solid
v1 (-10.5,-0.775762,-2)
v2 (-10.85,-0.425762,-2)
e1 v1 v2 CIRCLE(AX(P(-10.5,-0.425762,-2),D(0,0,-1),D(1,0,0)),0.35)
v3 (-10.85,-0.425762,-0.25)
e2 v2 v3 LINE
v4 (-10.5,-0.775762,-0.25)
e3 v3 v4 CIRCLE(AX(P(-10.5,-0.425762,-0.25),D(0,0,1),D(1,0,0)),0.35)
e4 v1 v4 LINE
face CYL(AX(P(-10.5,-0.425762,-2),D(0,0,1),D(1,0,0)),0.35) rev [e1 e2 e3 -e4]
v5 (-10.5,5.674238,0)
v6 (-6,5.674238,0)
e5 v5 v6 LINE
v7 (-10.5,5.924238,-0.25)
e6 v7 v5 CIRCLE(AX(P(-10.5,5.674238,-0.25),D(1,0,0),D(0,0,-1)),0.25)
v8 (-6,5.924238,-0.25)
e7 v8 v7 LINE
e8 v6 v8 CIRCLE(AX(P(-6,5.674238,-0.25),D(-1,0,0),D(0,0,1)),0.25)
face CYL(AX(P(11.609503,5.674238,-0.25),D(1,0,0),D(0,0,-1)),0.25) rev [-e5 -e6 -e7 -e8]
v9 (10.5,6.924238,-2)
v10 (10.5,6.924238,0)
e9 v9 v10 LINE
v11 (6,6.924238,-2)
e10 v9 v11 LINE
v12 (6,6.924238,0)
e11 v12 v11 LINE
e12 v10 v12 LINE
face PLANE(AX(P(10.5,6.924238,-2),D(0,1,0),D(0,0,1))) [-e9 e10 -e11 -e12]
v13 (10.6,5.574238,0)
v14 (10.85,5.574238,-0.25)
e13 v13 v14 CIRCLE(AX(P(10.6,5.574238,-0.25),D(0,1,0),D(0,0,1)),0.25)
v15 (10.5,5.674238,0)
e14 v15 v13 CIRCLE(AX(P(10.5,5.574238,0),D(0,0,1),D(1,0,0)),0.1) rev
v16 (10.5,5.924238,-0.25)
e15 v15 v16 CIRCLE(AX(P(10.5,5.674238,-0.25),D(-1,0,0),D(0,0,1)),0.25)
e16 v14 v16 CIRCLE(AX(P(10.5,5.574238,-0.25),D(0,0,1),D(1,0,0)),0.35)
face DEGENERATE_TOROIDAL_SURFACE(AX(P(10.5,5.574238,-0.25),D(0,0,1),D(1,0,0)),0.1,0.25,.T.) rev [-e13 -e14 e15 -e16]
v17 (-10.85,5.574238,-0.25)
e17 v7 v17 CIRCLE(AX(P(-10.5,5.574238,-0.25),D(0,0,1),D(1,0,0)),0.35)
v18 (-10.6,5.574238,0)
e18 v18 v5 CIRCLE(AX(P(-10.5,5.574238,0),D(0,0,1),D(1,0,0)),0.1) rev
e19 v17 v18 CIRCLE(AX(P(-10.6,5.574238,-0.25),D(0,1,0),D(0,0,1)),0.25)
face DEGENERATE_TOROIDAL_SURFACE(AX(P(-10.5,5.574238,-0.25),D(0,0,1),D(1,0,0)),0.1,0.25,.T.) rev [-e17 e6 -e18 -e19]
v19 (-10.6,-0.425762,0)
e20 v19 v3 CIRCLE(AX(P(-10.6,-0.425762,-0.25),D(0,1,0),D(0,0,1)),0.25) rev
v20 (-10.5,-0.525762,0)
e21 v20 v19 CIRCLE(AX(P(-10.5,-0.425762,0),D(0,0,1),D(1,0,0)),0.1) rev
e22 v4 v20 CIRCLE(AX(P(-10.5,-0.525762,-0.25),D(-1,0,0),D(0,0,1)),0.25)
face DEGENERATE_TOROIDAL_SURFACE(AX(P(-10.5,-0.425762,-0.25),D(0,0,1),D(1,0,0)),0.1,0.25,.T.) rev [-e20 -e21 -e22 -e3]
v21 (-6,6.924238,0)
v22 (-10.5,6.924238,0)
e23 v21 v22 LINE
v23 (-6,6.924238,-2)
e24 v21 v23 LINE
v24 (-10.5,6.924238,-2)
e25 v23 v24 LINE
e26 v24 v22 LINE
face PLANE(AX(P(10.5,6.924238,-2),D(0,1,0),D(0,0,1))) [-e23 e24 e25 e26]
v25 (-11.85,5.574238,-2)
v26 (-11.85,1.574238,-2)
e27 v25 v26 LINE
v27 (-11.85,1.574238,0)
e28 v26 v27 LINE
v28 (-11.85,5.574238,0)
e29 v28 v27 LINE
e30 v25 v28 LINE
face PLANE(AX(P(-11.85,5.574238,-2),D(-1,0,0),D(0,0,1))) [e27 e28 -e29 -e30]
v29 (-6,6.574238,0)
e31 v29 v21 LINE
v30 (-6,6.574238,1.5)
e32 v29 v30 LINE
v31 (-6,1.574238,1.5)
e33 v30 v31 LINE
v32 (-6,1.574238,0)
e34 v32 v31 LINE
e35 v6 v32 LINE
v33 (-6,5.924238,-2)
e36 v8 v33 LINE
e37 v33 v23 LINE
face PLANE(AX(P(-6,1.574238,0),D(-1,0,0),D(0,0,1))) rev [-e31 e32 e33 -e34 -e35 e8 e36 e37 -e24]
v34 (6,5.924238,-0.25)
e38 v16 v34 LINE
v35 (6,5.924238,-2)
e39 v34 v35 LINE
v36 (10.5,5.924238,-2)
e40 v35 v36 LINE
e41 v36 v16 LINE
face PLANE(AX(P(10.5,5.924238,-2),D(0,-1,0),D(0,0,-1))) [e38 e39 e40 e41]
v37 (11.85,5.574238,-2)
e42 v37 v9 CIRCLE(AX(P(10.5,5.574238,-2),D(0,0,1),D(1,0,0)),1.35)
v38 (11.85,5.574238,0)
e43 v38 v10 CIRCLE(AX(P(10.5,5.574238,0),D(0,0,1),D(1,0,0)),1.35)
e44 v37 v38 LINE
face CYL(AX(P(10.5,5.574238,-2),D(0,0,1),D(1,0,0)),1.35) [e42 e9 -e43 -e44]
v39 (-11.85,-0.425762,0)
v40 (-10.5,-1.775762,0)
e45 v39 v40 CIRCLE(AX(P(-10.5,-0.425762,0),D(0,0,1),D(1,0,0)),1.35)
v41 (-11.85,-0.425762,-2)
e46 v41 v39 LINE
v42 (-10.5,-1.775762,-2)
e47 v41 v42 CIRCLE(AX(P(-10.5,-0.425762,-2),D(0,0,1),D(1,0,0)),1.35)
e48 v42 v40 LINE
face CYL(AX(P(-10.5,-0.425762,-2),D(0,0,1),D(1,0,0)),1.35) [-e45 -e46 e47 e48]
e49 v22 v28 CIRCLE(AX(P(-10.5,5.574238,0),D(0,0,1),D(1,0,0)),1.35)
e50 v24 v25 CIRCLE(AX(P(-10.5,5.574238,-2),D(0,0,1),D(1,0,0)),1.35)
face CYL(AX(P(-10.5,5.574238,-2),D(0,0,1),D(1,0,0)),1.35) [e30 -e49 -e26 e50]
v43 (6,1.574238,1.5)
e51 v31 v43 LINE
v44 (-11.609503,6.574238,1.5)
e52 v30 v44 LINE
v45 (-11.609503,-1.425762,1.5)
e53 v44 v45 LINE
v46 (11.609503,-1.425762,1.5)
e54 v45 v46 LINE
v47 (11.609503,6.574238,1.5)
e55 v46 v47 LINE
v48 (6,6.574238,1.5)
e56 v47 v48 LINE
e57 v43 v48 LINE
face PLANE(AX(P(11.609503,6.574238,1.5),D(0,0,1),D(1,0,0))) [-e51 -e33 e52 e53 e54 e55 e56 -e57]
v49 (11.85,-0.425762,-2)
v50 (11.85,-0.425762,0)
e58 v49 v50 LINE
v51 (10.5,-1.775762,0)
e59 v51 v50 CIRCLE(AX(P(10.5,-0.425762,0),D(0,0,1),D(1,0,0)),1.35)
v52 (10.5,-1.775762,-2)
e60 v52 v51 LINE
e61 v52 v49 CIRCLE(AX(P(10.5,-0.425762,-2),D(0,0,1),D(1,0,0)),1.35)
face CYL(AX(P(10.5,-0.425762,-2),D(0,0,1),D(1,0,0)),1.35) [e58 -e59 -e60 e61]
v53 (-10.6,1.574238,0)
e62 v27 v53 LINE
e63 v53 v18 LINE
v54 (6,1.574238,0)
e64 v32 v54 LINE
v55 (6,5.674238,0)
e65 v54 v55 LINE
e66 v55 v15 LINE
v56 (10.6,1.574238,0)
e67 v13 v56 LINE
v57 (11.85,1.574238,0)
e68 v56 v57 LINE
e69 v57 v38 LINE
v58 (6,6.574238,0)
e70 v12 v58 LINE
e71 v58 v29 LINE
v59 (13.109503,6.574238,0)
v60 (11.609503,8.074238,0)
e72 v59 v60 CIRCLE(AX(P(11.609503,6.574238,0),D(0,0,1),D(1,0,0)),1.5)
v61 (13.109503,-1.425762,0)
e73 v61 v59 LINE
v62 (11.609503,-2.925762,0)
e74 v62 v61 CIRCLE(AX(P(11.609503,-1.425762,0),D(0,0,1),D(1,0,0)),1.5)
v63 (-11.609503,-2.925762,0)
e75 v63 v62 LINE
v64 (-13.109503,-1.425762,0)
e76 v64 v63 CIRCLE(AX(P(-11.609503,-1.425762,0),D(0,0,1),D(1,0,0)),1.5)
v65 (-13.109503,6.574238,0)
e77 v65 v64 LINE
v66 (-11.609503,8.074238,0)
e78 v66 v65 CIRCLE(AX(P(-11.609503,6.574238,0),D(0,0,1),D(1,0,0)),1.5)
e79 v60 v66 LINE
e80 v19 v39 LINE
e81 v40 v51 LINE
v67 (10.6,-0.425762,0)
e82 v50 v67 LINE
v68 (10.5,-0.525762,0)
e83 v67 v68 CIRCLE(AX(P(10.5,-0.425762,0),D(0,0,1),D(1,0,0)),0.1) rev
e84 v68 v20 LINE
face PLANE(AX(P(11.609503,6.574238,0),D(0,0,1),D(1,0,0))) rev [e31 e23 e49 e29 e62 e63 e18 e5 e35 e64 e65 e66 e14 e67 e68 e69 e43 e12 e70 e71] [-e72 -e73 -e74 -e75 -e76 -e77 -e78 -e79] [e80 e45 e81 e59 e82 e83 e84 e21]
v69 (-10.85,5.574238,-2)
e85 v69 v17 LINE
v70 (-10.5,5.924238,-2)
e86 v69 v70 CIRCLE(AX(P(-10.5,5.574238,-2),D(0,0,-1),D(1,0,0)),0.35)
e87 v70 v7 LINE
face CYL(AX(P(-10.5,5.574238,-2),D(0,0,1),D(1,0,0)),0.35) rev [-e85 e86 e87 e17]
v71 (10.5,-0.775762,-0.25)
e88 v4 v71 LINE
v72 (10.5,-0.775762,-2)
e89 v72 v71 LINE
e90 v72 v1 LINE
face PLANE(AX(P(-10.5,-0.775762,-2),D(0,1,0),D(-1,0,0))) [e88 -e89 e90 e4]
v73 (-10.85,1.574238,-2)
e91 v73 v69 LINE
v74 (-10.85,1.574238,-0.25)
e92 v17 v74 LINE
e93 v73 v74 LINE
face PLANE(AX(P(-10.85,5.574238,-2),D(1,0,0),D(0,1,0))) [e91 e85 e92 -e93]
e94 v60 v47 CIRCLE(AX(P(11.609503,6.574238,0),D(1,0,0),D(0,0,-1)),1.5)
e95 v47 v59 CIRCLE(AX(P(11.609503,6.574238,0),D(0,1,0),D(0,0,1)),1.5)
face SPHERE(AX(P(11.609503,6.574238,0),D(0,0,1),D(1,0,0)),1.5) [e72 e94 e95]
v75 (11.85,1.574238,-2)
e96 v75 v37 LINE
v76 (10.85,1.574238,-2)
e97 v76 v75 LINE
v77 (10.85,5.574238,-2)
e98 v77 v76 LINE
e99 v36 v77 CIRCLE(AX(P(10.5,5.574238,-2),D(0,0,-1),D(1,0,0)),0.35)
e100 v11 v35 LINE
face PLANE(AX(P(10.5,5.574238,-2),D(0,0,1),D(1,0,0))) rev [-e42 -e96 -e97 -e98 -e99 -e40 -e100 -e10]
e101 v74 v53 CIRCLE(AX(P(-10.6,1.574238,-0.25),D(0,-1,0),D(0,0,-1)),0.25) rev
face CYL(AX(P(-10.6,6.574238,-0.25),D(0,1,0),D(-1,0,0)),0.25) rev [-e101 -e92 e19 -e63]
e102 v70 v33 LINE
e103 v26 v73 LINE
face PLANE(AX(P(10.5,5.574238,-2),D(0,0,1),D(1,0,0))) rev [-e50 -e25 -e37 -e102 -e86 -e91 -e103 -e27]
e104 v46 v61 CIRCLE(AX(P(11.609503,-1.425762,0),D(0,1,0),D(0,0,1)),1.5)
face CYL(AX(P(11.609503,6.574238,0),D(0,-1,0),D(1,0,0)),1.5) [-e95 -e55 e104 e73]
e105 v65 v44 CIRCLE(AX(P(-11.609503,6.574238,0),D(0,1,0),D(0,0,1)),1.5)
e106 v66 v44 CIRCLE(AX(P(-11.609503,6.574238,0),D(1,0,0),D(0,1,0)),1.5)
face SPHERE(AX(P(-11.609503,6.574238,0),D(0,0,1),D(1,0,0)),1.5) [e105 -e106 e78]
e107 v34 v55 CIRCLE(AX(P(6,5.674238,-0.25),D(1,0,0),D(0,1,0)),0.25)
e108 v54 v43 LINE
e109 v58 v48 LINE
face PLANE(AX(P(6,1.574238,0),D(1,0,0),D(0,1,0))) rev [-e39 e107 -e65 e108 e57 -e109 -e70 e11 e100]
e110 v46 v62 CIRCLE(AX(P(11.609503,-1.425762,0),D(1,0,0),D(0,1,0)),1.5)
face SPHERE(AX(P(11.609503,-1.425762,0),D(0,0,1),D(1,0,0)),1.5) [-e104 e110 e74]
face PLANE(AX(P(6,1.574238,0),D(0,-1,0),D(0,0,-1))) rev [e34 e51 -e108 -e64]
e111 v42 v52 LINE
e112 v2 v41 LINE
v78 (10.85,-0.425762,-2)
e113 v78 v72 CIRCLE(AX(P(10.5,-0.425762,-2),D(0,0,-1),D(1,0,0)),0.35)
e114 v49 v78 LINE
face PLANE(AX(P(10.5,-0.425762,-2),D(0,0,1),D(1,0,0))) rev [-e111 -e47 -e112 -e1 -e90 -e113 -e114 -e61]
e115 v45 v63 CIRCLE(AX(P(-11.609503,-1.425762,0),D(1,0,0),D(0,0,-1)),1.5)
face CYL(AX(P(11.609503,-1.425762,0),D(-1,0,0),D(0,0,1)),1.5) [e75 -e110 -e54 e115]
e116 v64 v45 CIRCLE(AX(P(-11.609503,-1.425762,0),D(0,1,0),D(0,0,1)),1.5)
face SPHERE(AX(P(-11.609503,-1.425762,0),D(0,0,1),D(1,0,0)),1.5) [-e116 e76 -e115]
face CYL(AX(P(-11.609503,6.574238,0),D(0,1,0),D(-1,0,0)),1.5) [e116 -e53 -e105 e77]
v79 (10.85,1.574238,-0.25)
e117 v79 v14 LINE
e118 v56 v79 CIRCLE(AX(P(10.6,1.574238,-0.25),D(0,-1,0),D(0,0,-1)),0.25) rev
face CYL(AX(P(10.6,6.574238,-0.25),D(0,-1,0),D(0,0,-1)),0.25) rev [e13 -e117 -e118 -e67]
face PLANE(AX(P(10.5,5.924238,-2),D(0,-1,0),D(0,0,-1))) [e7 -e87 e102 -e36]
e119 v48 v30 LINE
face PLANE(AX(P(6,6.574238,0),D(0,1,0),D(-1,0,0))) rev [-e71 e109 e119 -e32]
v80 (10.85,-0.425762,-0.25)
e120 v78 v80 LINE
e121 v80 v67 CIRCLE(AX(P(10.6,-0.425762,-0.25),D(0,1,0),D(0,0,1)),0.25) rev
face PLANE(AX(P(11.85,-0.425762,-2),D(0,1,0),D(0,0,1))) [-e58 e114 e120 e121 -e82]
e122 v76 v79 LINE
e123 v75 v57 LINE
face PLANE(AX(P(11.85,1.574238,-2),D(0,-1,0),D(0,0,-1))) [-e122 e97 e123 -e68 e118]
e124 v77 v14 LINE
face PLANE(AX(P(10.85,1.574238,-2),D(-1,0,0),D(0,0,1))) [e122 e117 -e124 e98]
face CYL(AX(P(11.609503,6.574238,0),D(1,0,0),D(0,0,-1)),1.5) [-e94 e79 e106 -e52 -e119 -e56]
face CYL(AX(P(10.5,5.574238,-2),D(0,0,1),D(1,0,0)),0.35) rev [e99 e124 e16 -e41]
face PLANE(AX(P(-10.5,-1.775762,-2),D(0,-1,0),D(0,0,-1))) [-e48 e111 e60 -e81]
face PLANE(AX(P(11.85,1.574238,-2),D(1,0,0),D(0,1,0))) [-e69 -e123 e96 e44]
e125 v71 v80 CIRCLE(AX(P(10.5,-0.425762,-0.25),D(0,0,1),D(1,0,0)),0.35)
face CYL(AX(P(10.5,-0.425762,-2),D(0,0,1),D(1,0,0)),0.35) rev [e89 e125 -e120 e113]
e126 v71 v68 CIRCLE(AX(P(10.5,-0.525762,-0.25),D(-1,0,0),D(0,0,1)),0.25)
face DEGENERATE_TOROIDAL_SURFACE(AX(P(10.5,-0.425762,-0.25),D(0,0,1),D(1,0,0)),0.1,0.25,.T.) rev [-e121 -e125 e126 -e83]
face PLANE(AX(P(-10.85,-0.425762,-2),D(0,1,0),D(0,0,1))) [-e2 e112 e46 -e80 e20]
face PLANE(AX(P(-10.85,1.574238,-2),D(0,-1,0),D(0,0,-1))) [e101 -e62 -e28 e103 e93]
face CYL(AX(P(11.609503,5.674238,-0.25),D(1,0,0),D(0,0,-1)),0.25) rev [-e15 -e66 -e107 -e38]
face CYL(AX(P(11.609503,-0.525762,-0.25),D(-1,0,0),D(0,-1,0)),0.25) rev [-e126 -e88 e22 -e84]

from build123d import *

# Parameters (mm, degrees)
BOSS_EXTRUDE1_DEPTH   = 2
BOSS_EXTRUDE1_2_DEPTH = 2
BOSS_EXTRUDE2_DEPTH   = 1.5
FILLET1_R             = 1.5
SKETCH4_W             = 12
SKETCH4_H             = 5
CUT_EXTRUDE1_DEPTH    = 1.5
SKETCH5_W             = 12
SKETCH5_H             = 1
CUT_EXTRUDE2_DEPTH    = 2
FILLET2_R             = 0.25


with BuildPart() as part:
    # Sketch2 → Boss-Extrude1 (new body)
    with BuildSketch(Plane.XY):
        with BuildLine():
            Line((11.85, -0.425762181), (10.85, -0.425762181))
            ThreePointArc((10.85, -0.425762181), (10.747487373, -0.673249555), (10.5, -0.775762181))
            Line((10.5, -0.775762181), (-10.5, -0.775762181))
            ThreePointArc((-10.5, -0.775762181), (-10.747487373, -0.673249555), (-10.85, -0.425762181))
            Line((-10.85, -0.425762181), (-11.85, -0.425762181))
            ThreePointArc((-11.85, -0.425762181), (-11.454594155, -1.380356336), (-10.5, -1.775762181))
            Line((-10.5, -1.775762181), (10.5, -1.775762181))
            ThreePointArc((10.5, -1.775762181), (11.454594155, -1.380356336), (11.85, -0.425762181))
        make_face()
    extrude(amount=-BOSS_EXTRUDE1_DEPTH)



with BuildPart() as body_2:
    # Sketch2 → Boss-Extrude1 2 (new body)
    with BuildSketch(Plane.XY):
        with BuildLine():
            Line((11.85, 1.574237819), (10.85, 1.574237819))
            Line((10.85, 1.574237819), (10.85, 5.574237819))
            ThreePointArc((10.85, 5.574237819), (10.747487373, 5.821725192), (10.5, 5.924237819))
            Line((10.5, 5.924237819), (-10.5, 5.924237819))
            ThreePointArc((-10.5, 5.924237819), (-10.747487373, 5.821725192), (-10.85, 5.574237819))
            Line((-10.85, 5.574237819), (-10.85, 1.574237819))
            Line((-10.85, 1.574237819), (-11.85, 1.574237819))
            Line((-11.85, 1.574237819), (-11.85, 5.574237819))
            ThreePointArc((-11.85, 5.574237819), (-11.454594155, 6.528831973), (-10.5, 6.924237819))
            Line((-10.5, 6.924237819), (10.5, 6.924237819))
            ThreePointArc((10.5, 6.924237819), (11.454594155, 6.528831973), (11.85, 5.574237819))
            Line((11.85, 5.574237819), (11.85, 1.574237819))
        make_face()
    extrude(amount=-BOSS_EXTRUDE1_2_DEPTH)


with BuildPart() as part_1:
    add(part.part)

    add(body_2.part)  # Boss-Extrude2 merges body 2
    # Sketch3 → Boss-Extrude2 (add)
    with BuildSketch(Plane.XY):
        with BuildLine():
            Line((11.6095027, 8.074237819), (-11.6095027, 8.074237819))
            ThreePointArc((-11.6095027, 8.074237819), (-12.670162872, 7.63489799), (-13.1095027, 6.574237819))
            Line((-13.1095027, 6.574237819), (-13.1095027, -1.425762181))
            ThreePointArc((-13.1095027, -1.425762181), (-12.670162872, -2.486422353), (-11.6095027, -2.925762181))
            Line((-11.6095027, -2.925762181), (11.6095027, -2.925762181))
            ThreePointArc((11.6095027, -2.925762181), (12.670162872, -2.486422353), (13.1095027, -1.425762181))
            Line((13.1095027, -1.425762181), (13.1095027, 6.574237819))
            ThreePointArc((13.1095027, 6.574237819), (12.670162872, 7.63489799), (11.6095027, 8.074237819))
        make_face()
    extrude(amount=BOSS_EXTRUDE2_DEPTH)

    # Fillet1
    fillet1_edges = [part_1.edges().sort_by_distance(p)[0] for p in [
        (12.670162872, 7.63489799, 1.5),
        (13.1095027, 2.574237819, 1.5),
        (12.670162872, -2.486422353, 1.5),
        (0, -2.925762181, 1.5),
        (-12.670162872, -2.486422353, 1.5),
        (-13.1095027, 2.574237819, 1.5),
        (-12.670162872, 7.63489799, 1.5),
        (0, 8.074237819, 1.5),
    ]]
    fillet(fillet1_edges, radius=FILLET1_R - 0.0001)  # a hair under: the kernel refuses the full size

    # Sketch4 → Cut-Extrude1 (cut)
    with BuildSketch(Plane.XY.offset(1.5)):
        with Locations((0, 4.074237819)):
            Rectangle(SKETCH4_W, SKETCH4_H)
    extrude(amount=-CUT_EXTRUDE1_DEPTH, mode=Mode.SUBTRACT)

    # Sketch5 → Cut-Extrude2 (cut)
    with BuildSketch(Plane(origin=(0, 0, -2), x_dir=(-1, 0, 0), z_dir=(0, 0, -1))):
        with Locations((0, 6.424237819)):
            Rectangle(SKETCH5_W, SKETCH5_H)
    extrude(amount=-CUT_EXTRUDE2_DEPTH, mode=Mode.SUBTRACT)

    # Fillet2
    fillet2_edges = [part_1.edges().sort_by_distance(p)[0] for p in [
        (0, -0.775762181, 0),
        (10.747487373, -0.673249555, 0),
        (10.747487373, 5.821725192, 0),
        (10.85, 3.574237819, 0),
        (-10.85, 3.574237819, 0),
        (-10.747487373, 5.821725192, 0),
        (-8.25, 5.924237819, 0),
        (8.25, 5.924237819, 0),
        (-10.747487373, -0.673249555, 0),
    ]]
    fillet(fillet2_edges, radius=FILLET2_R)


solid = part_1.part
